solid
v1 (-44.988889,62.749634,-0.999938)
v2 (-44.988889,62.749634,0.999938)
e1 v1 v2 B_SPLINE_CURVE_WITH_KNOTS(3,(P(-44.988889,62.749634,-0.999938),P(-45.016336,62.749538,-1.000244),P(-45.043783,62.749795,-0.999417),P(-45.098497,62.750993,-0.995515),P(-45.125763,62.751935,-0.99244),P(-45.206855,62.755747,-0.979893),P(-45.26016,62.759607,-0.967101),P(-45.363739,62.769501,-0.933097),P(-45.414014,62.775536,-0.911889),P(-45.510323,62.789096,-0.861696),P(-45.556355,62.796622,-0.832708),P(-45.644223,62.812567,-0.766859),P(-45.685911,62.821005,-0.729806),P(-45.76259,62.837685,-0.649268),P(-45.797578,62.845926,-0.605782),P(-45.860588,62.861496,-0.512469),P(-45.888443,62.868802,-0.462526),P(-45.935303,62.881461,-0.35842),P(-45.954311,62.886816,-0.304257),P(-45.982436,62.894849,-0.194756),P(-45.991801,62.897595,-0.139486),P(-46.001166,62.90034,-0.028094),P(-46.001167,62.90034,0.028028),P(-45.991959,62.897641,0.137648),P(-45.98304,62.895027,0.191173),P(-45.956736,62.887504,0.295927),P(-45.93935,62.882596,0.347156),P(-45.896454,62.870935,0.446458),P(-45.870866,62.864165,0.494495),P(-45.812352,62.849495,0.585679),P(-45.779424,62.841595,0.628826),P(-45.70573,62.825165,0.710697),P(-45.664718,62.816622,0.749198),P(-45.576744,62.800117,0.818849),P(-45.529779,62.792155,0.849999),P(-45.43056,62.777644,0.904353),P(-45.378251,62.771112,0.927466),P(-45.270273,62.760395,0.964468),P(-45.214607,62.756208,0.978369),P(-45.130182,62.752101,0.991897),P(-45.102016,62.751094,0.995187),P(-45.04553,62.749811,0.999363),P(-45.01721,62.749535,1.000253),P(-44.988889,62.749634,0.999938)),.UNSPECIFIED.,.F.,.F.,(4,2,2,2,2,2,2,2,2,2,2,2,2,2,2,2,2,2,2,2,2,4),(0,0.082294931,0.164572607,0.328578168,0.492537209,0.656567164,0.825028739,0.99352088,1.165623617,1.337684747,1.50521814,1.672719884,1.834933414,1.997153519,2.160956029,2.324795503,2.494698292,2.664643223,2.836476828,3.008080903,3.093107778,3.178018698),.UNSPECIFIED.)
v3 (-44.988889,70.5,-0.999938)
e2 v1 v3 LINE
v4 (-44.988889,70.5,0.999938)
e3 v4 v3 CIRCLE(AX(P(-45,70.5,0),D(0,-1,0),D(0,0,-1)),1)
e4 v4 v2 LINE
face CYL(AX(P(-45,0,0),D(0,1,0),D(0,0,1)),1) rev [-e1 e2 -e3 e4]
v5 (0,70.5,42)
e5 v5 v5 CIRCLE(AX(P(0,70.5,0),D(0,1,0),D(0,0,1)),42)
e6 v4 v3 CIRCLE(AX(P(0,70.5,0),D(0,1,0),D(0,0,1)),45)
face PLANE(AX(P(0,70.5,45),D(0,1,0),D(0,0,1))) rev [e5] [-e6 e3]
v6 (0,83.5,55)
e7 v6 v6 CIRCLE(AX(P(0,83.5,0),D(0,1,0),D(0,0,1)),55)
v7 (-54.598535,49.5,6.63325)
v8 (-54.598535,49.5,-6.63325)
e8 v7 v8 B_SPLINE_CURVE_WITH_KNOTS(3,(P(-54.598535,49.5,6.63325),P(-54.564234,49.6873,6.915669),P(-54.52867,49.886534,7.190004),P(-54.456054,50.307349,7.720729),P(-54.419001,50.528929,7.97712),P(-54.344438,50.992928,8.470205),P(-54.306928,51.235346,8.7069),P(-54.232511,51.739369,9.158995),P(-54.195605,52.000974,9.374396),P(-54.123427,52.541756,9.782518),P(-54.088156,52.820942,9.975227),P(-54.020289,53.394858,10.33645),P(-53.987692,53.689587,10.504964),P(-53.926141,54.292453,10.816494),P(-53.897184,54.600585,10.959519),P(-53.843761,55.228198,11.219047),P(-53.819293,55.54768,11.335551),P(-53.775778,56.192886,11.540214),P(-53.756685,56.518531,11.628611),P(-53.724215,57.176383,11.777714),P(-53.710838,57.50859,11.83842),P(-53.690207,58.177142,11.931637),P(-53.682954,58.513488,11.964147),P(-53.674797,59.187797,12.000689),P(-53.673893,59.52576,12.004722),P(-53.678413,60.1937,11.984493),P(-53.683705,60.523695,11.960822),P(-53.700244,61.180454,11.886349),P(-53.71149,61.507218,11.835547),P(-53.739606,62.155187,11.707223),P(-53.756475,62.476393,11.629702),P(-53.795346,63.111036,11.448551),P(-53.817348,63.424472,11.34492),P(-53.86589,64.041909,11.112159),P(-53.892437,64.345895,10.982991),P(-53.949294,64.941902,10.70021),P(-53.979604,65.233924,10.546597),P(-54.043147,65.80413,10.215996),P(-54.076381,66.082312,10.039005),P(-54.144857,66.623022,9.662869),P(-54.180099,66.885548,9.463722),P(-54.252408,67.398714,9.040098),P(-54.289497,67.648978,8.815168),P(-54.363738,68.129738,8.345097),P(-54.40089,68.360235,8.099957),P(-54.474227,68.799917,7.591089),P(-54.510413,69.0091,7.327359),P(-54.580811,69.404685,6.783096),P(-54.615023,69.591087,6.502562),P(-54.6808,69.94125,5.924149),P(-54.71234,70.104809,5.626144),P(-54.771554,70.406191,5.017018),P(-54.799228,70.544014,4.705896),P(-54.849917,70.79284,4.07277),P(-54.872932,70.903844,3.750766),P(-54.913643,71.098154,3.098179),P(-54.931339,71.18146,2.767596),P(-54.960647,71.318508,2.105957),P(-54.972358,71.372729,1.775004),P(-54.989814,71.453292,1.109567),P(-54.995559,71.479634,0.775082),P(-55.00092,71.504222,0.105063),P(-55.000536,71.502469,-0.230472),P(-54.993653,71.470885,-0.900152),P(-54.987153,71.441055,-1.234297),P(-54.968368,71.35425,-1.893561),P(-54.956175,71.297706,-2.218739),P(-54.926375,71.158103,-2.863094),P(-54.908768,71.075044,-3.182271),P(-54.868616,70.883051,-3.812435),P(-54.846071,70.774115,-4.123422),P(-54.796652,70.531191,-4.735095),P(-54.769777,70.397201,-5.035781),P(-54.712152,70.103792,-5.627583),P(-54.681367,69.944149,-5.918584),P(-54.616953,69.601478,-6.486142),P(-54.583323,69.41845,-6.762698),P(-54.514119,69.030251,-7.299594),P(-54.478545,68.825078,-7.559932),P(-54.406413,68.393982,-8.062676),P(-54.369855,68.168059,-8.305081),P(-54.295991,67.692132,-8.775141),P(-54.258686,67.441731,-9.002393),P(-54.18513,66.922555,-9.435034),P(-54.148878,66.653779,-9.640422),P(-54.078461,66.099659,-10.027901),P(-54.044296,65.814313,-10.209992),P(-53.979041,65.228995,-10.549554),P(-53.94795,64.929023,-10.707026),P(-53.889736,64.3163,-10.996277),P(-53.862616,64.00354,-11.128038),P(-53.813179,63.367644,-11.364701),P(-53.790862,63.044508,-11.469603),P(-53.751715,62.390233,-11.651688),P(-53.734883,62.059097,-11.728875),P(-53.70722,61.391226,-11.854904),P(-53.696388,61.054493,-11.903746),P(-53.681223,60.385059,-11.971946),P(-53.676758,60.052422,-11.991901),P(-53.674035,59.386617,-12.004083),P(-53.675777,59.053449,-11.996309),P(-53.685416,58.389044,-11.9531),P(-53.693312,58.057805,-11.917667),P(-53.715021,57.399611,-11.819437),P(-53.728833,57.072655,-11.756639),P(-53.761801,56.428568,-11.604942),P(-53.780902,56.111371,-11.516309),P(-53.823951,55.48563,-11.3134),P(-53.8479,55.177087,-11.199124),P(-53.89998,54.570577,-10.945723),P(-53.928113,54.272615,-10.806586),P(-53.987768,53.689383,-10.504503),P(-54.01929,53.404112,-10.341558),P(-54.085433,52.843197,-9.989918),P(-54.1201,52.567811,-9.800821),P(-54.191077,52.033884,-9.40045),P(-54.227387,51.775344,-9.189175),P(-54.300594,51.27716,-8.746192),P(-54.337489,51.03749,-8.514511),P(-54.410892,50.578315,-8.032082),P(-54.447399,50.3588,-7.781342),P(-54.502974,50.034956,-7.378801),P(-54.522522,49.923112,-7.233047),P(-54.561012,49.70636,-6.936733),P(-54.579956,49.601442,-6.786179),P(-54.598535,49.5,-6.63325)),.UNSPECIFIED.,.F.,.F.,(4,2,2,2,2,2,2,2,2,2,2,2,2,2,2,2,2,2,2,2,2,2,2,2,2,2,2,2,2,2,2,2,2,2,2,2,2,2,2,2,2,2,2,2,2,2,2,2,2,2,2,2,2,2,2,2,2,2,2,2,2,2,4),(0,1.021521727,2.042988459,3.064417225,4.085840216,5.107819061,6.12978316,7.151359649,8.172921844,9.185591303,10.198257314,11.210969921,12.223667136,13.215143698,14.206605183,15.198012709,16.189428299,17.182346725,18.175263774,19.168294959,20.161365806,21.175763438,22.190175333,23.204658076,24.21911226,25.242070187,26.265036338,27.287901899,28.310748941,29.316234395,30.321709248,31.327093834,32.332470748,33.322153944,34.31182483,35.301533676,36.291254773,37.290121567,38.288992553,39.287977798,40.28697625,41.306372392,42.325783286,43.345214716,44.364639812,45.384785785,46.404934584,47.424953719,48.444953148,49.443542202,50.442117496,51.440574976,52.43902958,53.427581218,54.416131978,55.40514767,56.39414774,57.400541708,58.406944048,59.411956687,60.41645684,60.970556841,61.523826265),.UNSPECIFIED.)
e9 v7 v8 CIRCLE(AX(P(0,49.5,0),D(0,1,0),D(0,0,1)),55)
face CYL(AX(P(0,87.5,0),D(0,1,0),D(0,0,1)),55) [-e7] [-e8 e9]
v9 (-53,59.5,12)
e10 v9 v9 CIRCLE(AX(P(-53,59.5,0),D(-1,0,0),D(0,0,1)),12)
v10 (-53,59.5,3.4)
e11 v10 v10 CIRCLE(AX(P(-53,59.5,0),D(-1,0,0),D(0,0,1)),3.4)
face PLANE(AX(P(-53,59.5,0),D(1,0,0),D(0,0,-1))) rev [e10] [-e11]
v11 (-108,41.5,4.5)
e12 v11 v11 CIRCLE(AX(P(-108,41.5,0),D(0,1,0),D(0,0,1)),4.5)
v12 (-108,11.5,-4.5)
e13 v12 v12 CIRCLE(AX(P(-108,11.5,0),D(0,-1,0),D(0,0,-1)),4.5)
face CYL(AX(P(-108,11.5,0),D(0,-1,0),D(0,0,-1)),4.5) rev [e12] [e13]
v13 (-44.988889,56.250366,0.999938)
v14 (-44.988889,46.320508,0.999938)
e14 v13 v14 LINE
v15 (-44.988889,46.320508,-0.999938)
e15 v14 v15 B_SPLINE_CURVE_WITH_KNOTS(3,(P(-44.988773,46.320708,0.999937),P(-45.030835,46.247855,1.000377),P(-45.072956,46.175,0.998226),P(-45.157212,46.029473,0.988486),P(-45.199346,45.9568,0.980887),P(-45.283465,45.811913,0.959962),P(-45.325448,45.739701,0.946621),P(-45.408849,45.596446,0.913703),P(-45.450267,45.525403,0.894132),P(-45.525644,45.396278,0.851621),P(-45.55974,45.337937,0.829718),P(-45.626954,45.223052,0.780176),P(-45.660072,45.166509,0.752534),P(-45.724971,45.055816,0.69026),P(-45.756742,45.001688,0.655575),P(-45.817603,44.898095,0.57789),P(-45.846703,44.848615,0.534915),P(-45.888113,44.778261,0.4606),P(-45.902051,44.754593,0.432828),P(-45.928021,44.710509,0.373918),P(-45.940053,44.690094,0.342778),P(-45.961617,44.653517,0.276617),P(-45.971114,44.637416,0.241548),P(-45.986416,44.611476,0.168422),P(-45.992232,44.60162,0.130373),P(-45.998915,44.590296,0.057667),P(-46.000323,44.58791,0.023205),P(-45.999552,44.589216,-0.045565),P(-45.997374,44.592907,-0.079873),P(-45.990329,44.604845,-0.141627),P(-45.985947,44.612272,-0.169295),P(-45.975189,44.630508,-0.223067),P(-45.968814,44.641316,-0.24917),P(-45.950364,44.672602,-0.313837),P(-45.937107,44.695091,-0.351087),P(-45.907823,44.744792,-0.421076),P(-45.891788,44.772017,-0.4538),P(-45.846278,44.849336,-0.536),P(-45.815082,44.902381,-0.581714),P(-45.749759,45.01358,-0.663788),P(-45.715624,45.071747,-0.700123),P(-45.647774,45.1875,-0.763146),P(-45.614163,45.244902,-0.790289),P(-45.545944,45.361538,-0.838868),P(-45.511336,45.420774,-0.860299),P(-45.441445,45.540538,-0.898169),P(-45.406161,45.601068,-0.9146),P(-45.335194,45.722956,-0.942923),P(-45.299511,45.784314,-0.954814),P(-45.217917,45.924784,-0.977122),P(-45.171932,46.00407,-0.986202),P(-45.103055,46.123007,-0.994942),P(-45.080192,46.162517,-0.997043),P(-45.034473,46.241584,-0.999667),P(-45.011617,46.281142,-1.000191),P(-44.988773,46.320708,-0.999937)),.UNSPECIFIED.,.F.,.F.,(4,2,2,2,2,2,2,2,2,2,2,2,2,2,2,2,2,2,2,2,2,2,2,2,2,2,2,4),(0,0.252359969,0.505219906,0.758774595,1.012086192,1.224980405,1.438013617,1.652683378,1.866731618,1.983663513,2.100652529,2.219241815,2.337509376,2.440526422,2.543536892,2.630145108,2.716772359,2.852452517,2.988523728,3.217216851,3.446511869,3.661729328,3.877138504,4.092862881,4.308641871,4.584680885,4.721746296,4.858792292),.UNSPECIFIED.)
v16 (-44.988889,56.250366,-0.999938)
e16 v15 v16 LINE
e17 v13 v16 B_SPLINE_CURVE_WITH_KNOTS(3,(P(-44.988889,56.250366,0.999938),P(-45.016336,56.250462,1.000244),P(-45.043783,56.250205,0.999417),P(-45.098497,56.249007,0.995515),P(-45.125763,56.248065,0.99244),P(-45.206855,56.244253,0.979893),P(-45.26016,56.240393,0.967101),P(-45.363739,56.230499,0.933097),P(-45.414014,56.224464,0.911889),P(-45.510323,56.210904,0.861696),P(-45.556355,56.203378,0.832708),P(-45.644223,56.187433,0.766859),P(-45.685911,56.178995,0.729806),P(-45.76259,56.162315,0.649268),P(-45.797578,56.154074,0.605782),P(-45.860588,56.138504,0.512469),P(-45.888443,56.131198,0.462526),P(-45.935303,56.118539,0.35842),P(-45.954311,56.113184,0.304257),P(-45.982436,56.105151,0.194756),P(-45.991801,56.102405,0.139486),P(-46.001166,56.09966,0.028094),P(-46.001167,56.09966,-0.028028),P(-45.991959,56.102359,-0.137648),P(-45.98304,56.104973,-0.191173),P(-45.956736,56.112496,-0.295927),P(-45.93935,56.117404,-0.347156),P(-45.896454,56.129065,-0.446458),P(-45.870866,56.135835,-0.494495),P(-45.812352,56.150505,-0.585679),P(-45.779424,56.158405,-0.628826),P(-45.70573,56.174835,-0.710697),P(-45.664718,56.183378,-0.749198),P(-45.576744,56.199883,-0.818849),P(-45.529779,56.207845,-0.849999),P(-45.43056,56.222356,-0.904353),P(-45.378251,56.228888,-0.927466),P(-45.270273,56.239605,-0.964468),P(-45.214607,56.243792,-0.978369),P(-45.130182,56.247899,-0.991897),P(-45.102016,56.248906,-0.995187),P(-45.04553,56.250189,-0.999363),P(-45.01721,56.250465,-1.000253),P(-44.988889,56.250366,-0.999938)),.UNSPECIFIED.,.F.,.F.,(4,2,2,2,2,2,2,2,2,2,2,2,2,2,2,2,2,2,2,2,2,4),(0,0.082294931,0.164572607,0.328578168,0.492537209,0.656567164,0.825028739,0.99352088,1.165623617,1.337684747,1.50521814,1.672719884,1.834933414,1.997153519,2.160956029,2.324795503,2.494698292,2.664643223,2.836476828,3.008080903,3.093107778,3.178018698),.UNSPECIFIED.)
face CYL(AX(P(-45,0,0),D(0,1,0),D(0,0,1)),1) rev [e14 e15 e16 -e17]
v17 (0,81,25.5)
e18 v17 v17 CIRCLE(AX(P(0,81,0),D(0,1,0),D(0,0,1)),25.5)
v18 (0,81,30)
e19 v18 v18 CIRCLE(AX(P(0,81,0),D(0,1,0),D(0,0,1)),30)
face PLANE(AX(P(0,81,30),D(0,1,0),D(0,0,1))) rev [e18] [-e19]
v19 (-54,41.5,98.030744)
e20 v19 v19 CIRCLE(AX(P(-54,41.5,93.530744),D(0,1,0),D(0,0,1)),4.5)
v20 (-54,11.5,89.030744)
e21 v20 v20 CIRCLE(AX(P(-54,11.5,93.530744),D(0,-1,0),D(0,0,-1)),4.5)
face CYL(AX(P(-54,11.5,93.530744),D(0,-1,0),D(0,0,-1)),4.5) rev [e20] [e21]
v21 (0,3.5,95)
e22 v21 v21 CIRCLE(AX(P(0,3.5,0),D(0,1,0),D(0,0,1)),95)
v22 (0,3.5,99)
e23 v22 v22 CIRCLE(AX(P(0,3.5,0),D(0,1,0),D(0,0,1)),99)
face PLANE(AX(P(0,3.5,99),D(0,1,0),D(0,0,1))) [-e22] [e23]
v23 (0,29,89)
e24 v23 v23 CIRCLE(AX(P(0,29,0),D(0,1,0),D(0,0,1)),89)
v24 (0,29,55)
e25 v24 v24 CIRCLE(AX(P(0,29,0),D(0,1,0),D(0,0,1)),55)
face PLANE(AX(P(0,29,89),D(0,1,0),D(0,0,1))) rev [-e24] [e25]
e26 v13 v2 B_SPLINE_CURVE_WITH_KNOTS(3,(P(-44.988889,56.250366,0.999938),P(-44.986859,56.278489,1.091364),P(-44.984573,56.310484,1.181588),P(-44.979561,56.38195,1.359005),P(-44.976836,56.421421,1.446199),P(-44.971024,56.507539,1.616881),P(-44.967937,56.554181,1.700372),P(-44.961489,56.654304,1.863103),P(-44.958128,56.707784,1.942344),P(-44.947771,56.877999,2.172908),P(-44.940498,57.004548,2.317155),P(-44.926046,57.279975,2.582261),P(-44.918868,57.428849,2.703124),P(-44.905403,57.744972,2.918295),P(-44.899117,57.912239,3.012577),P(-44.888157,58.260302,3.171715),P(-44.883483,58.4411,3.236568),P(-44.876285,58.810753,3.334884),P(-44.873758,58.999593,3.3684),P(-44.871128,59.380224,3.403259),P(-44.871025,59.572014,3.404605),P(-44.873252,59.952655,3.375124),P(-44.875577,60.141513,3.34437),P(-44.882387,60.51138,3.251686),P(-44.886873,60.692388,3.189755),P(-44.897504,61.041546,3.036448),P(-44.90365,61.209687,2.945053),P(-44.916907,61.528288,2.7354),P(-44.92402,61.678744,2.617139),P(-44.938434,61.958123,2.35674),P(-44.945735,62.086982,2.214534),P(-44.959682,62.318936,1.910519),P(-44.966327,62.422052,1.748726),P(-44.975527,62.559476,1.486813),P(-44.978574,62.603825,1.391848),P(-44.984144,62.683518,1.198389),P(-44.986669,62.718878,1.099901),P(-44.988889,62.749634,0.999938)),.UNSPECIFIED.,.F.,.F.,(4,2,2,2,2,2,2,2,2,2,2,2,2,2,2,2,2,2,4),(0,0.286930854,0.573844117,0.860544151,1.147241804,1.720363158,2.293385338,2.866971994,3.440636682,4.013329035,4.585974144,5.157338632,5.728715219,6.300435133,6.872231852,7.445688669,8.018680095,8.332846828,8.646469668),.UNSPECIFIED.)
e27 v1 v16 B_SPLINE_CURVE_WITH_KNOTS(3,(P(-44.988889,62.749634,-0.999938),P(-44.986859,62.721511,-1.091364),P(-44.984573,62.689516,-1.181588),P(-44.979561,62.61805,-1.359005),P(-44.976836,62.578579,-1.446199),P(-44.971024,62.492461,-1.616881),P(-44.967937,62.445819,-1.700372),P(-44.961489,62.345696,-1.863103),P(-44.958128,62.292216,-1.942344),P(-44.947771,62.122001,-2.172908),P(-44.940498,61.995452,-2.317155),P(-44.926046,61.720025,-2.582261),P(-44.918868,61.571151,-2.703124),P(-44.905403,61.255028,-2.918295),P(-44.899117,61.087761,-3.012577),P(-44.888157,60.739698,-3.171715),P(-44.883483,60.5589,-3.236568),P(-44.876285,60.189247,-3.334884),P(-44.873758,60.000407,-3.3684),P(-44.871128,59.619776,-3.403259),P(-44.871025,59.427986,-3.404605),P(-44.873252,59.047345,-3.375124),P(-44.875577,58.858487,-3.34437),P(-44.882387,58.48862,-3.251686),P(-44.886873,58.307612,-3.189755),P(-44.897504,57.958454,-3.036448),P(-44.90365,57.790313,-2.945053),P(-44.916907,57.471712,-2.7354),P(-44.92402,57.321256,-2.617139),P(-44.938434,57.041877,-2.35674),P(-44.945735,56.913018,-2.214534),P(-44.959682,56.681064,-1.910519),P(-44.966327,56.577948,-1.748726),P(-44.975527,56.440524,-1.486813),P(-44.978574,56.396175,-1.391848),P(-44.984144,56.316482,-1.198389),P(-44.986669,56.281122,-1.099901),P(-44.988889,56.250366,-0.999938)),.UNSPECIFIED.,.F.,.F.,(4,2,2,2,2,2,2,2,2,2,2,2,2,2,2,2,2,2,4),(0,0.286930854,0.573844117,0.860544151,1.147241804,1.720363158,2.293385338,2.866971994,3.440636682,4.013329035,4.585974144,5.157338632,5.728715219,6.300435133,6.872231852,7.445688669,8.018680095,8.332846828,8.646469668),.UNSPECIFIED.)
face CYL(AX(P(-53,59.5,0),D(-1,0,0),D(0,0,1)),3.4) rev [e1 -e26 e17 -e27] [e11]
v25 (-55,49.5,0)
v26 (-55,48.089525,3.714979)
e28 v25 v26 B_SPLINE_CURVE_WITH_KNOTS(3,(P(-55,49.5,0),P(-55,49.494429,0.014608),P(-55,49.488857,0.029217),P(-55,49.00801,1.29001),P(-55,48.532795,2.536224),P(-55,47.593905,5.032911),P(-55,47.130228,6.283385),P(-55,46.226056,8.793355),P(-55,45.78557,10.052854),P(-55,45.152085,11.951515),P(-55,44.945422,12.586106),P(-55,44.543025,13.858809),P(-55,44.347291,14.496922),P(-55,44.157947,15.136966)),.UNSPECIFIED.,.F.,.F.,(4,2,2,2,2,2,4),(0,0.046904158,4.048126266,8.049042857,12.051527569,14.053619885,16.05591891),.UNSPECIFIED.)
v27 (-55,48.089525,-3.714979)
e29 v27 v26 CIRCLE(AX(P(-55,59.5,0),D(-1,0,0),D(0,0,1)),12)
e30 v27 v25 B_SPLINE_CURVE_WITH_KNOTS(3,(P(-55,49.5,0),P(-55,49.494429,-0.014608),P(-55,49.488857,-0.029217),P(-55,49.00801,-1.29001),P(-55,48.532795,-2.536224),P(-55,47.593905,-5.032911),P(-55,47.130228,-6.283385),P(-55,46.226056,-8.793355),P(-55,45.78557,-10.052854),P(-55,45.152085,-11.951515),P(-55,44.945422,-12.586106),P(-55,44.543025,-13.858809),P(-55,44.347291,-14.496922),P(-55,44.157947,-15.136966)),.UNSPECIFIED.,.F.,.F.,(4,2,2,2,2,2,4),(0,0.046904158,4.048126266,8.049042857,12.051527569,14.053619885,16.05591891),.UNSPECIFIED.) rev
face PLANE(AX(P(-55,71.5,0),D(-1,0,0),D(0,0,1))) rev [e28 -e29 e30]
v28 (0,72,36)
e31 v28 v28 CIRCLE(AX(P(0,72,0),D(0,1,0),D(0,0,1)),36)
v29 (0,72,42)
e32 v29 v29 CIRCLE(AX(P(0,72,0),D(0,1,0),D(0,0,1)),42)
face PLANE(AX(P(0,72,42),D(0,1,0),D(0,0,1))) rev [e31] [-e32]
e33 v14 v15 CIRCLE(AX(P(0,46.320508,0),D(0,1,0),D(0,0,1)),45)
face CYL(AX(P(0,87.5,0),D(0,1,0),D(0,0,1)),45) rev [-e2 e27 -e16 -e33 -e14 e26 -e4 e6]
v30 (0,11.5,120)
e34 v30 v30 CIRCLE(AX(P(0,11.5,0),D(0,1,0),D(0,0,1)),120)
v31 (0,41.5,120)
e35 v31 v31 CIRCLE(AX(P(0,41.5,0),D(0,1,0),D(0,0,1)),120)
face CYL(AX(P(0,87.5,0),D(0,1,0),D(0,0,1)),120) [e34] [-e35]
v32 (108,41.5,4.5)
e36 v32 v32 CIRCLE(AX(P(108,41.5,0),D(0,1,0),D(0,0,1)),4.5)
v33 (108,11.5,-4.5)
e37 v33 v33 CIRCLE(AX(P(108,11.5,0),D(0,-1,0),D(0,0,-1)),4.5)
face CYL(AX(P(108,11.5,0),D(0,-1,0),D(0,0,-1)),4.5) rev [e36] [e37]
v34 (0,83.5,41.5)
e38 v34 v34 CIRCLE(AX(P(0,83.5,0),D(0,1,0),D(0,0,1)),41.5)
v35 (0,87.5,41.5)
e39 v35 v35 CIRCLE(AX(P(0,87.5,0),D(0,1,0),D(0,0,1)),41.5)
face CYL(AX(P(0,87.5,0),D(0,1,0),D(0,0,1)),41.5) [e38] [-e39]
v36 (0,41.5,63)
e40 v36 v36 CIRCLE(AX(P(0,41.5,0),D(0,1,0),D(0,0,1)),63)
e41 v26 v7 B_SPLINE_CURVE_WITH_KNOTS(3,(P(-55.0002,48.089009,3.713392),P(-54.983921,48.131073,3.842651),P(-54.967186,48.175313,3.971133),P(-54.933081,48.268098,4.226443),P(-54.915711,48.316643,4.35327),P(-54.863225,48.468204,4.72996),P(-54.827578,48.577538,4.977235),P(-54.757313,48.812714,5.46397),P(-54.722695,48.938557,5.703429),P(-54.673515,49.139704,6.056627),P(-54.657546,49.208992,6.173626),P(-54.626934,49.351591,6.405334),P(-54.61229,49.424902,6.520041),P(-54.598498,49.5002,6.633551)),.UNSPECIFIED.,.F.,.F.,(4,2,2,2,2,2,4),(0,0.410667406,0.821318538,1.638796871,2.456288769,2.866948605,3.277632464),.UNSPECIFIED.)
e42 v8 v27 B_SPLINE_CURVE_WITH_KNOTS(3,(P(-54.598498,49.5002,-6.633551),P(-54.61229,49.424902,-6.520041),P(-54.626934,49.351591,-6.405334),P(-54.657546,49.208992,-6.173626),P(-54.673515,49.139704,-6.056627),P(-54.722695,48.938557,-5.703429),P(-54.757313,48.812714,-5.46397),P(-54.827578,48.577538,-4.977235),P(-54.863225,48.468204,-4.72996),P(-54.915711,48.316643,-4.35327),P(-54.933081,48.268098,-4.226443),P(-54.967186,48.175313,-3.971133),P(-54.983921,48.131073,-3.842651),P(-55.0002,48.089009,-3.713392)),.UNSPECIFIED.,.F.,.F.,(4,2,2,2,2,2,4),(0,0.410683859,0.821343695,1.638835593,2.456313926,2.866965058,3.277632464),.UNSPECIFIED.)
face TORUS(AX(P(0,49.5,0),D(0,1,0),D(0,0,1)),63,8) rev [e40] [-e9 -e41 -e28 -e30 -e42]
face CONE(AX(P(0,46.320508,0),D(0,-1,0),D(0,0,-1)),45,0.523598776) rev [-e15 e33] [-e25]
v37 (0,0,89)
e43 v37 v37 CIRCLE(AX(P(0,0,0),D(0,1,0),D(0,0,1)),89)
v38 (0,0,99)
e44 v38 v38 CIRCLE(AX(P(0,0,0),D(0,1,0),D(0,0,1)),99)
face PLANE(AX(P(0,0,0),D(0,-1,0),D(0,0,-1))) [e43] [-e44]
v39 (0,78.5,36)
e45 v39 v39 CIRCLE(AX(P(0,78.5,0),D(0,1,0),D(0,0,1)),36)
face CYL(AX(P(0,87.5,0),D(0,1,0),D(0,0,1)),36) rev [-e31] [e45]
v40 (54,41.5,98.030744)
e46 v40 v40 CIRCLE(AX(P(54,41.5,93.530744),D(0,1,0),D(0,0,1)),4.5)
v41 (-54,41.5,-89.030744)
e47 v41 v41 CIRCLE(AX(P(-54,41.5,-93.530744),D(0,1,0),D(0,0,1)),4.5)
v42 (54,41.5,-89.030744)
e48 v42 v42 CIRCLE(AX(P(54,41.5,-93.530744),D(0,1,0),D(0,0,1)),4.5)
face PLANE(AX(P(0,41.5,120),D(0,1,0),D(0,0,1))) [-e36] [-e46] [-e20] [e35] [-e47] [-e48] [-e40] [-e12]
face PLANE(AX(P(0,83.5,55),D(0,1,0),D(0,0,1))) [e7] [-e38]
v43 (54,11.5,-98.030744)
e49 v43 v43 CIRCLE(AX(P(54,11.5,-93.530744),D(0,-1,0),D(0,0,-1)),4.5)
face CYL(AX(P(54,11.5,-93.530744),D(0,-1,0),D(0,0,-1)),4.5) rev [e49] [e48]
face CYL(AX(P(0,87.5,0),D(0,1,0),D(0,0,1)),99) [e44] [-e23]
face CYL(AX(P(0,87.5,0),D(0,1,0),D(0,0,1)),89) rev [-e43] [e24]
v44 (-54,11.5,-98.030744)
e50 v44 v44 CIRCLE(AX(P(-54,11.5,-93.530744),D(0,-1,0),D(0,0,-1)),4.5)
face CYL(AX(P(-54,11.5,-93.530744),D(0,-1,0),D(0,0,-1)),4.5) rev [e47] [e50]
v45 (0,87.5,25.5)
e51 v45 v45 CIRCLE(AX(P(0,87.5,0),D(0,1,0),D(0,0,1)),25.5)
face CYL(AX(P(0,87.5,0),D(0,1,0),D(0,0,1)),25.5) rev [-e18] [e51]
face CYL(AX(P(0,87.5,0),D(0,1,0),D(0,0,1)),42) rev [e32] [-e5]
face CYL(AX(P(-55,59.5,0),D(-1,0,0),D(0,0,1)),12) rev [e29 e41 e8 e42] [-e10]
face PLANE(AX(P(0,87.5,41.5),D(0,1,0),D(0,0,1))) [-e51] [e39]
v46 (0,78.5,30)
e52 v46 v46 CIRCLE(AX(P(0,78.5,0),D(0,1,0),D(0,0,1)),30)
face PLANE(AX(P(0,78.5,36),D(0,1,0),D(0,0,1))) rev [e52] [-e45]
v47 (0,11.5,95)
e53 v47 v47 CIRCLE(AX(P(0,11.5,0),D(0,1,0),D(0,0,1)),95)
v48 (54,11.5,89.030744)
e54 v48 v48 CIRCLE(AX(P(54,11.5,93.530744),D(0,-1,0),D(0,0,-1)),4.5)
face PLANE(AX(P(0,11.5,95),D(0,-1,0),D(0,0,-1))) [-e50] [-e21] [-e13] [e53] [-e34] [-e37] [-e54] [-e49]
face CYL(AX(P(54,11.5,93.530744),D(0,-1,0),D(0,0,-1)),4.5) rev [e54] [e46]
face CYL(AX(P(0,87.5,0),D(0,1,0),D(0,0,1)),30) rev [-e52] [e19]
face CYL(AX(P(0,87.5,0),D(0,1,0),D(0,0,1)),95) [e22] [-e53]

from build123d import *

# Parameters (mm, degrees)
SKETCH_3_R              = 1
CUT_EXTRUDE_1_DEPTH     = 184.766835963
SKETCH_4_W              = 12
SKETCH_4_H              = 2
HOLE_WIZARD_M8_1_REACH  = 230.003
HOLE_WIZARD_M8_1_BORE_R = 3.4
HOLE_START              = 11.5
HOLE_WIZARD_2_OUTLINE_R = 4.5
HOLE_WIZARD_2_DEPTH     = 30


# Read off the part's stored shape, not the designer's step: 孔2
with BuildPart() as part:
    # 草图1 → 旋转1 (revolve)
    with BuildSketch(Plane(origin=(0, 0, 0), x_dir=(0, 0, -1), z_dir=(1, 0, 0))):
        with BuildLine():
            Line((0, 0), (-99, 0))
            Line((-99, 0), (-99, 3.5))
            Line((-99, 3.5), (-95, 3.5))
            Line((-95, 3.5), (-95, 11.5))
            Line((-95, 11.5), (-120, 11.5))
            Line((-120, 11.5), (-120, 41.5))
            Line((-120, 41.5), (-63, 41.5))
            ThreePointArc((-63, 41.5), (-57.343145751, 43.843145751), (-55, 49.5))
            Line((-55, 49.5), (-55, 83.5))
            Line((-55, 83.5), (-41.5, 83.5))
            Line((-41.5, 83.5), (-41.5, 87.5))
            Line((-41.5, 87.5), (0, 87.5))
            Line((0, 87.5), (0, 0))
        make_face()
    revolve(axis=Axis((0, 87.5, 0), (0, -1, 0)))

    # 草图2 → 切除-旋转1 (revolve, cut)
    with BuildSketch(Plane(origin=(0, 0, 0), x_dir=(0, 0, -1), z_dir=(1, 0, 0))):
        Polygon((-89, 0), (-89, 29), (-55, 29), (-45, 46.320508076), (-45, 70.5), (-42, 70.5), (-42, 72), (-36, 72), (-36, 78.5), (-30, 78.5), (-30, 81), (-25.5, 81), (-25.5, 87.5), (0, 87.5), (0, 0), align=None)
    revolve(axis=Axis((0, 87.5, 0), (0, -1, 0)), mode=Mode.SUBTRACT)

    # 草图3 → 切除-拉伸1 (cut, through all)
    with BuildSketch(Plane.XZ.offset(-70.5)):
        with Locations((-45, 0)):
            Circle(SKETCH_3_R)
    extrude(amount=CUT_EXTRUDE_1_DEPTH, mode=Mode.SUBTRACT)

    # 草图4 → 孔1 (revolve, cut)
    with BuildSketch(Plane(origin=(-55, 59.5, 0), x_dir=(0, 0, 1), z_dir=(0, 1, 0))):
        with Locations((6, 1)):
            Rectangle(SKETCH_4_W, SKETCH_4_H)
    revolve(axis=Axis((55, 59.5, 0), (-1, 0, 0)), mode=Mode.SUBTRACT)

    # M8 螺纹孔1 bore → M8 螺纹孔1 (cut, up to next)
    with BuildSketch(Plane.ZY.offset(53), mode=Mode.PRIVATE) as hole_wizard_m8_1_sk1:
        with Locations((0, 59.5)):
            Circle(HOLE_WIZARD_M8_1_BORE_R)
    hole_wizard_m8_1_tool1 = extrude(hole_wizard_m8_1_sk1.sketch, amount=-HOLE_WIZARD_M8_1_REACH, mode=Mode.PRIVATE) & part.part
    add(hole_wizard_m8_1_tool1.solids().sort_by_distance((-53, 59.5, 0))[0], mode=Mode.SUBTRACT)

    # 孔2 outline → 孔2 (cut)
    with BuildSketch(Plane(origin=(0, 0, 0), x_dir=(1, 0, 0), z_dir=(0, 1, 0)).offset(HOLE_START)):
        with Locations((-54, 93.530743609)):
            Circle(HOLE_WIZARD_2_OUTLINE_R)
        with Locations((54, 93.530743609)):
            Circle(HOLE_WIZARD_2_OUTLINE_R)
        with Locations((108, 0)):
            Circle(HOLE_WIZARD_2_OUTLINE_R)
        with Locations((54, -93.530743609)):
            Circle(HOLE_WIZARD_2_OUTLINE_R)
        with Locations((-54, -93.530743609)):
            Circle(HOLE_WIZARD_2_OUTLINE_R)
        with Locations((-108, 0)):
            Circle(HOLE_WIZARD_2_OUTLINE_R)
    extrude(amount=HOLE_WIZARD_2_DEPTH, mode=Mode.SUBTRACT)


solid = part.part
